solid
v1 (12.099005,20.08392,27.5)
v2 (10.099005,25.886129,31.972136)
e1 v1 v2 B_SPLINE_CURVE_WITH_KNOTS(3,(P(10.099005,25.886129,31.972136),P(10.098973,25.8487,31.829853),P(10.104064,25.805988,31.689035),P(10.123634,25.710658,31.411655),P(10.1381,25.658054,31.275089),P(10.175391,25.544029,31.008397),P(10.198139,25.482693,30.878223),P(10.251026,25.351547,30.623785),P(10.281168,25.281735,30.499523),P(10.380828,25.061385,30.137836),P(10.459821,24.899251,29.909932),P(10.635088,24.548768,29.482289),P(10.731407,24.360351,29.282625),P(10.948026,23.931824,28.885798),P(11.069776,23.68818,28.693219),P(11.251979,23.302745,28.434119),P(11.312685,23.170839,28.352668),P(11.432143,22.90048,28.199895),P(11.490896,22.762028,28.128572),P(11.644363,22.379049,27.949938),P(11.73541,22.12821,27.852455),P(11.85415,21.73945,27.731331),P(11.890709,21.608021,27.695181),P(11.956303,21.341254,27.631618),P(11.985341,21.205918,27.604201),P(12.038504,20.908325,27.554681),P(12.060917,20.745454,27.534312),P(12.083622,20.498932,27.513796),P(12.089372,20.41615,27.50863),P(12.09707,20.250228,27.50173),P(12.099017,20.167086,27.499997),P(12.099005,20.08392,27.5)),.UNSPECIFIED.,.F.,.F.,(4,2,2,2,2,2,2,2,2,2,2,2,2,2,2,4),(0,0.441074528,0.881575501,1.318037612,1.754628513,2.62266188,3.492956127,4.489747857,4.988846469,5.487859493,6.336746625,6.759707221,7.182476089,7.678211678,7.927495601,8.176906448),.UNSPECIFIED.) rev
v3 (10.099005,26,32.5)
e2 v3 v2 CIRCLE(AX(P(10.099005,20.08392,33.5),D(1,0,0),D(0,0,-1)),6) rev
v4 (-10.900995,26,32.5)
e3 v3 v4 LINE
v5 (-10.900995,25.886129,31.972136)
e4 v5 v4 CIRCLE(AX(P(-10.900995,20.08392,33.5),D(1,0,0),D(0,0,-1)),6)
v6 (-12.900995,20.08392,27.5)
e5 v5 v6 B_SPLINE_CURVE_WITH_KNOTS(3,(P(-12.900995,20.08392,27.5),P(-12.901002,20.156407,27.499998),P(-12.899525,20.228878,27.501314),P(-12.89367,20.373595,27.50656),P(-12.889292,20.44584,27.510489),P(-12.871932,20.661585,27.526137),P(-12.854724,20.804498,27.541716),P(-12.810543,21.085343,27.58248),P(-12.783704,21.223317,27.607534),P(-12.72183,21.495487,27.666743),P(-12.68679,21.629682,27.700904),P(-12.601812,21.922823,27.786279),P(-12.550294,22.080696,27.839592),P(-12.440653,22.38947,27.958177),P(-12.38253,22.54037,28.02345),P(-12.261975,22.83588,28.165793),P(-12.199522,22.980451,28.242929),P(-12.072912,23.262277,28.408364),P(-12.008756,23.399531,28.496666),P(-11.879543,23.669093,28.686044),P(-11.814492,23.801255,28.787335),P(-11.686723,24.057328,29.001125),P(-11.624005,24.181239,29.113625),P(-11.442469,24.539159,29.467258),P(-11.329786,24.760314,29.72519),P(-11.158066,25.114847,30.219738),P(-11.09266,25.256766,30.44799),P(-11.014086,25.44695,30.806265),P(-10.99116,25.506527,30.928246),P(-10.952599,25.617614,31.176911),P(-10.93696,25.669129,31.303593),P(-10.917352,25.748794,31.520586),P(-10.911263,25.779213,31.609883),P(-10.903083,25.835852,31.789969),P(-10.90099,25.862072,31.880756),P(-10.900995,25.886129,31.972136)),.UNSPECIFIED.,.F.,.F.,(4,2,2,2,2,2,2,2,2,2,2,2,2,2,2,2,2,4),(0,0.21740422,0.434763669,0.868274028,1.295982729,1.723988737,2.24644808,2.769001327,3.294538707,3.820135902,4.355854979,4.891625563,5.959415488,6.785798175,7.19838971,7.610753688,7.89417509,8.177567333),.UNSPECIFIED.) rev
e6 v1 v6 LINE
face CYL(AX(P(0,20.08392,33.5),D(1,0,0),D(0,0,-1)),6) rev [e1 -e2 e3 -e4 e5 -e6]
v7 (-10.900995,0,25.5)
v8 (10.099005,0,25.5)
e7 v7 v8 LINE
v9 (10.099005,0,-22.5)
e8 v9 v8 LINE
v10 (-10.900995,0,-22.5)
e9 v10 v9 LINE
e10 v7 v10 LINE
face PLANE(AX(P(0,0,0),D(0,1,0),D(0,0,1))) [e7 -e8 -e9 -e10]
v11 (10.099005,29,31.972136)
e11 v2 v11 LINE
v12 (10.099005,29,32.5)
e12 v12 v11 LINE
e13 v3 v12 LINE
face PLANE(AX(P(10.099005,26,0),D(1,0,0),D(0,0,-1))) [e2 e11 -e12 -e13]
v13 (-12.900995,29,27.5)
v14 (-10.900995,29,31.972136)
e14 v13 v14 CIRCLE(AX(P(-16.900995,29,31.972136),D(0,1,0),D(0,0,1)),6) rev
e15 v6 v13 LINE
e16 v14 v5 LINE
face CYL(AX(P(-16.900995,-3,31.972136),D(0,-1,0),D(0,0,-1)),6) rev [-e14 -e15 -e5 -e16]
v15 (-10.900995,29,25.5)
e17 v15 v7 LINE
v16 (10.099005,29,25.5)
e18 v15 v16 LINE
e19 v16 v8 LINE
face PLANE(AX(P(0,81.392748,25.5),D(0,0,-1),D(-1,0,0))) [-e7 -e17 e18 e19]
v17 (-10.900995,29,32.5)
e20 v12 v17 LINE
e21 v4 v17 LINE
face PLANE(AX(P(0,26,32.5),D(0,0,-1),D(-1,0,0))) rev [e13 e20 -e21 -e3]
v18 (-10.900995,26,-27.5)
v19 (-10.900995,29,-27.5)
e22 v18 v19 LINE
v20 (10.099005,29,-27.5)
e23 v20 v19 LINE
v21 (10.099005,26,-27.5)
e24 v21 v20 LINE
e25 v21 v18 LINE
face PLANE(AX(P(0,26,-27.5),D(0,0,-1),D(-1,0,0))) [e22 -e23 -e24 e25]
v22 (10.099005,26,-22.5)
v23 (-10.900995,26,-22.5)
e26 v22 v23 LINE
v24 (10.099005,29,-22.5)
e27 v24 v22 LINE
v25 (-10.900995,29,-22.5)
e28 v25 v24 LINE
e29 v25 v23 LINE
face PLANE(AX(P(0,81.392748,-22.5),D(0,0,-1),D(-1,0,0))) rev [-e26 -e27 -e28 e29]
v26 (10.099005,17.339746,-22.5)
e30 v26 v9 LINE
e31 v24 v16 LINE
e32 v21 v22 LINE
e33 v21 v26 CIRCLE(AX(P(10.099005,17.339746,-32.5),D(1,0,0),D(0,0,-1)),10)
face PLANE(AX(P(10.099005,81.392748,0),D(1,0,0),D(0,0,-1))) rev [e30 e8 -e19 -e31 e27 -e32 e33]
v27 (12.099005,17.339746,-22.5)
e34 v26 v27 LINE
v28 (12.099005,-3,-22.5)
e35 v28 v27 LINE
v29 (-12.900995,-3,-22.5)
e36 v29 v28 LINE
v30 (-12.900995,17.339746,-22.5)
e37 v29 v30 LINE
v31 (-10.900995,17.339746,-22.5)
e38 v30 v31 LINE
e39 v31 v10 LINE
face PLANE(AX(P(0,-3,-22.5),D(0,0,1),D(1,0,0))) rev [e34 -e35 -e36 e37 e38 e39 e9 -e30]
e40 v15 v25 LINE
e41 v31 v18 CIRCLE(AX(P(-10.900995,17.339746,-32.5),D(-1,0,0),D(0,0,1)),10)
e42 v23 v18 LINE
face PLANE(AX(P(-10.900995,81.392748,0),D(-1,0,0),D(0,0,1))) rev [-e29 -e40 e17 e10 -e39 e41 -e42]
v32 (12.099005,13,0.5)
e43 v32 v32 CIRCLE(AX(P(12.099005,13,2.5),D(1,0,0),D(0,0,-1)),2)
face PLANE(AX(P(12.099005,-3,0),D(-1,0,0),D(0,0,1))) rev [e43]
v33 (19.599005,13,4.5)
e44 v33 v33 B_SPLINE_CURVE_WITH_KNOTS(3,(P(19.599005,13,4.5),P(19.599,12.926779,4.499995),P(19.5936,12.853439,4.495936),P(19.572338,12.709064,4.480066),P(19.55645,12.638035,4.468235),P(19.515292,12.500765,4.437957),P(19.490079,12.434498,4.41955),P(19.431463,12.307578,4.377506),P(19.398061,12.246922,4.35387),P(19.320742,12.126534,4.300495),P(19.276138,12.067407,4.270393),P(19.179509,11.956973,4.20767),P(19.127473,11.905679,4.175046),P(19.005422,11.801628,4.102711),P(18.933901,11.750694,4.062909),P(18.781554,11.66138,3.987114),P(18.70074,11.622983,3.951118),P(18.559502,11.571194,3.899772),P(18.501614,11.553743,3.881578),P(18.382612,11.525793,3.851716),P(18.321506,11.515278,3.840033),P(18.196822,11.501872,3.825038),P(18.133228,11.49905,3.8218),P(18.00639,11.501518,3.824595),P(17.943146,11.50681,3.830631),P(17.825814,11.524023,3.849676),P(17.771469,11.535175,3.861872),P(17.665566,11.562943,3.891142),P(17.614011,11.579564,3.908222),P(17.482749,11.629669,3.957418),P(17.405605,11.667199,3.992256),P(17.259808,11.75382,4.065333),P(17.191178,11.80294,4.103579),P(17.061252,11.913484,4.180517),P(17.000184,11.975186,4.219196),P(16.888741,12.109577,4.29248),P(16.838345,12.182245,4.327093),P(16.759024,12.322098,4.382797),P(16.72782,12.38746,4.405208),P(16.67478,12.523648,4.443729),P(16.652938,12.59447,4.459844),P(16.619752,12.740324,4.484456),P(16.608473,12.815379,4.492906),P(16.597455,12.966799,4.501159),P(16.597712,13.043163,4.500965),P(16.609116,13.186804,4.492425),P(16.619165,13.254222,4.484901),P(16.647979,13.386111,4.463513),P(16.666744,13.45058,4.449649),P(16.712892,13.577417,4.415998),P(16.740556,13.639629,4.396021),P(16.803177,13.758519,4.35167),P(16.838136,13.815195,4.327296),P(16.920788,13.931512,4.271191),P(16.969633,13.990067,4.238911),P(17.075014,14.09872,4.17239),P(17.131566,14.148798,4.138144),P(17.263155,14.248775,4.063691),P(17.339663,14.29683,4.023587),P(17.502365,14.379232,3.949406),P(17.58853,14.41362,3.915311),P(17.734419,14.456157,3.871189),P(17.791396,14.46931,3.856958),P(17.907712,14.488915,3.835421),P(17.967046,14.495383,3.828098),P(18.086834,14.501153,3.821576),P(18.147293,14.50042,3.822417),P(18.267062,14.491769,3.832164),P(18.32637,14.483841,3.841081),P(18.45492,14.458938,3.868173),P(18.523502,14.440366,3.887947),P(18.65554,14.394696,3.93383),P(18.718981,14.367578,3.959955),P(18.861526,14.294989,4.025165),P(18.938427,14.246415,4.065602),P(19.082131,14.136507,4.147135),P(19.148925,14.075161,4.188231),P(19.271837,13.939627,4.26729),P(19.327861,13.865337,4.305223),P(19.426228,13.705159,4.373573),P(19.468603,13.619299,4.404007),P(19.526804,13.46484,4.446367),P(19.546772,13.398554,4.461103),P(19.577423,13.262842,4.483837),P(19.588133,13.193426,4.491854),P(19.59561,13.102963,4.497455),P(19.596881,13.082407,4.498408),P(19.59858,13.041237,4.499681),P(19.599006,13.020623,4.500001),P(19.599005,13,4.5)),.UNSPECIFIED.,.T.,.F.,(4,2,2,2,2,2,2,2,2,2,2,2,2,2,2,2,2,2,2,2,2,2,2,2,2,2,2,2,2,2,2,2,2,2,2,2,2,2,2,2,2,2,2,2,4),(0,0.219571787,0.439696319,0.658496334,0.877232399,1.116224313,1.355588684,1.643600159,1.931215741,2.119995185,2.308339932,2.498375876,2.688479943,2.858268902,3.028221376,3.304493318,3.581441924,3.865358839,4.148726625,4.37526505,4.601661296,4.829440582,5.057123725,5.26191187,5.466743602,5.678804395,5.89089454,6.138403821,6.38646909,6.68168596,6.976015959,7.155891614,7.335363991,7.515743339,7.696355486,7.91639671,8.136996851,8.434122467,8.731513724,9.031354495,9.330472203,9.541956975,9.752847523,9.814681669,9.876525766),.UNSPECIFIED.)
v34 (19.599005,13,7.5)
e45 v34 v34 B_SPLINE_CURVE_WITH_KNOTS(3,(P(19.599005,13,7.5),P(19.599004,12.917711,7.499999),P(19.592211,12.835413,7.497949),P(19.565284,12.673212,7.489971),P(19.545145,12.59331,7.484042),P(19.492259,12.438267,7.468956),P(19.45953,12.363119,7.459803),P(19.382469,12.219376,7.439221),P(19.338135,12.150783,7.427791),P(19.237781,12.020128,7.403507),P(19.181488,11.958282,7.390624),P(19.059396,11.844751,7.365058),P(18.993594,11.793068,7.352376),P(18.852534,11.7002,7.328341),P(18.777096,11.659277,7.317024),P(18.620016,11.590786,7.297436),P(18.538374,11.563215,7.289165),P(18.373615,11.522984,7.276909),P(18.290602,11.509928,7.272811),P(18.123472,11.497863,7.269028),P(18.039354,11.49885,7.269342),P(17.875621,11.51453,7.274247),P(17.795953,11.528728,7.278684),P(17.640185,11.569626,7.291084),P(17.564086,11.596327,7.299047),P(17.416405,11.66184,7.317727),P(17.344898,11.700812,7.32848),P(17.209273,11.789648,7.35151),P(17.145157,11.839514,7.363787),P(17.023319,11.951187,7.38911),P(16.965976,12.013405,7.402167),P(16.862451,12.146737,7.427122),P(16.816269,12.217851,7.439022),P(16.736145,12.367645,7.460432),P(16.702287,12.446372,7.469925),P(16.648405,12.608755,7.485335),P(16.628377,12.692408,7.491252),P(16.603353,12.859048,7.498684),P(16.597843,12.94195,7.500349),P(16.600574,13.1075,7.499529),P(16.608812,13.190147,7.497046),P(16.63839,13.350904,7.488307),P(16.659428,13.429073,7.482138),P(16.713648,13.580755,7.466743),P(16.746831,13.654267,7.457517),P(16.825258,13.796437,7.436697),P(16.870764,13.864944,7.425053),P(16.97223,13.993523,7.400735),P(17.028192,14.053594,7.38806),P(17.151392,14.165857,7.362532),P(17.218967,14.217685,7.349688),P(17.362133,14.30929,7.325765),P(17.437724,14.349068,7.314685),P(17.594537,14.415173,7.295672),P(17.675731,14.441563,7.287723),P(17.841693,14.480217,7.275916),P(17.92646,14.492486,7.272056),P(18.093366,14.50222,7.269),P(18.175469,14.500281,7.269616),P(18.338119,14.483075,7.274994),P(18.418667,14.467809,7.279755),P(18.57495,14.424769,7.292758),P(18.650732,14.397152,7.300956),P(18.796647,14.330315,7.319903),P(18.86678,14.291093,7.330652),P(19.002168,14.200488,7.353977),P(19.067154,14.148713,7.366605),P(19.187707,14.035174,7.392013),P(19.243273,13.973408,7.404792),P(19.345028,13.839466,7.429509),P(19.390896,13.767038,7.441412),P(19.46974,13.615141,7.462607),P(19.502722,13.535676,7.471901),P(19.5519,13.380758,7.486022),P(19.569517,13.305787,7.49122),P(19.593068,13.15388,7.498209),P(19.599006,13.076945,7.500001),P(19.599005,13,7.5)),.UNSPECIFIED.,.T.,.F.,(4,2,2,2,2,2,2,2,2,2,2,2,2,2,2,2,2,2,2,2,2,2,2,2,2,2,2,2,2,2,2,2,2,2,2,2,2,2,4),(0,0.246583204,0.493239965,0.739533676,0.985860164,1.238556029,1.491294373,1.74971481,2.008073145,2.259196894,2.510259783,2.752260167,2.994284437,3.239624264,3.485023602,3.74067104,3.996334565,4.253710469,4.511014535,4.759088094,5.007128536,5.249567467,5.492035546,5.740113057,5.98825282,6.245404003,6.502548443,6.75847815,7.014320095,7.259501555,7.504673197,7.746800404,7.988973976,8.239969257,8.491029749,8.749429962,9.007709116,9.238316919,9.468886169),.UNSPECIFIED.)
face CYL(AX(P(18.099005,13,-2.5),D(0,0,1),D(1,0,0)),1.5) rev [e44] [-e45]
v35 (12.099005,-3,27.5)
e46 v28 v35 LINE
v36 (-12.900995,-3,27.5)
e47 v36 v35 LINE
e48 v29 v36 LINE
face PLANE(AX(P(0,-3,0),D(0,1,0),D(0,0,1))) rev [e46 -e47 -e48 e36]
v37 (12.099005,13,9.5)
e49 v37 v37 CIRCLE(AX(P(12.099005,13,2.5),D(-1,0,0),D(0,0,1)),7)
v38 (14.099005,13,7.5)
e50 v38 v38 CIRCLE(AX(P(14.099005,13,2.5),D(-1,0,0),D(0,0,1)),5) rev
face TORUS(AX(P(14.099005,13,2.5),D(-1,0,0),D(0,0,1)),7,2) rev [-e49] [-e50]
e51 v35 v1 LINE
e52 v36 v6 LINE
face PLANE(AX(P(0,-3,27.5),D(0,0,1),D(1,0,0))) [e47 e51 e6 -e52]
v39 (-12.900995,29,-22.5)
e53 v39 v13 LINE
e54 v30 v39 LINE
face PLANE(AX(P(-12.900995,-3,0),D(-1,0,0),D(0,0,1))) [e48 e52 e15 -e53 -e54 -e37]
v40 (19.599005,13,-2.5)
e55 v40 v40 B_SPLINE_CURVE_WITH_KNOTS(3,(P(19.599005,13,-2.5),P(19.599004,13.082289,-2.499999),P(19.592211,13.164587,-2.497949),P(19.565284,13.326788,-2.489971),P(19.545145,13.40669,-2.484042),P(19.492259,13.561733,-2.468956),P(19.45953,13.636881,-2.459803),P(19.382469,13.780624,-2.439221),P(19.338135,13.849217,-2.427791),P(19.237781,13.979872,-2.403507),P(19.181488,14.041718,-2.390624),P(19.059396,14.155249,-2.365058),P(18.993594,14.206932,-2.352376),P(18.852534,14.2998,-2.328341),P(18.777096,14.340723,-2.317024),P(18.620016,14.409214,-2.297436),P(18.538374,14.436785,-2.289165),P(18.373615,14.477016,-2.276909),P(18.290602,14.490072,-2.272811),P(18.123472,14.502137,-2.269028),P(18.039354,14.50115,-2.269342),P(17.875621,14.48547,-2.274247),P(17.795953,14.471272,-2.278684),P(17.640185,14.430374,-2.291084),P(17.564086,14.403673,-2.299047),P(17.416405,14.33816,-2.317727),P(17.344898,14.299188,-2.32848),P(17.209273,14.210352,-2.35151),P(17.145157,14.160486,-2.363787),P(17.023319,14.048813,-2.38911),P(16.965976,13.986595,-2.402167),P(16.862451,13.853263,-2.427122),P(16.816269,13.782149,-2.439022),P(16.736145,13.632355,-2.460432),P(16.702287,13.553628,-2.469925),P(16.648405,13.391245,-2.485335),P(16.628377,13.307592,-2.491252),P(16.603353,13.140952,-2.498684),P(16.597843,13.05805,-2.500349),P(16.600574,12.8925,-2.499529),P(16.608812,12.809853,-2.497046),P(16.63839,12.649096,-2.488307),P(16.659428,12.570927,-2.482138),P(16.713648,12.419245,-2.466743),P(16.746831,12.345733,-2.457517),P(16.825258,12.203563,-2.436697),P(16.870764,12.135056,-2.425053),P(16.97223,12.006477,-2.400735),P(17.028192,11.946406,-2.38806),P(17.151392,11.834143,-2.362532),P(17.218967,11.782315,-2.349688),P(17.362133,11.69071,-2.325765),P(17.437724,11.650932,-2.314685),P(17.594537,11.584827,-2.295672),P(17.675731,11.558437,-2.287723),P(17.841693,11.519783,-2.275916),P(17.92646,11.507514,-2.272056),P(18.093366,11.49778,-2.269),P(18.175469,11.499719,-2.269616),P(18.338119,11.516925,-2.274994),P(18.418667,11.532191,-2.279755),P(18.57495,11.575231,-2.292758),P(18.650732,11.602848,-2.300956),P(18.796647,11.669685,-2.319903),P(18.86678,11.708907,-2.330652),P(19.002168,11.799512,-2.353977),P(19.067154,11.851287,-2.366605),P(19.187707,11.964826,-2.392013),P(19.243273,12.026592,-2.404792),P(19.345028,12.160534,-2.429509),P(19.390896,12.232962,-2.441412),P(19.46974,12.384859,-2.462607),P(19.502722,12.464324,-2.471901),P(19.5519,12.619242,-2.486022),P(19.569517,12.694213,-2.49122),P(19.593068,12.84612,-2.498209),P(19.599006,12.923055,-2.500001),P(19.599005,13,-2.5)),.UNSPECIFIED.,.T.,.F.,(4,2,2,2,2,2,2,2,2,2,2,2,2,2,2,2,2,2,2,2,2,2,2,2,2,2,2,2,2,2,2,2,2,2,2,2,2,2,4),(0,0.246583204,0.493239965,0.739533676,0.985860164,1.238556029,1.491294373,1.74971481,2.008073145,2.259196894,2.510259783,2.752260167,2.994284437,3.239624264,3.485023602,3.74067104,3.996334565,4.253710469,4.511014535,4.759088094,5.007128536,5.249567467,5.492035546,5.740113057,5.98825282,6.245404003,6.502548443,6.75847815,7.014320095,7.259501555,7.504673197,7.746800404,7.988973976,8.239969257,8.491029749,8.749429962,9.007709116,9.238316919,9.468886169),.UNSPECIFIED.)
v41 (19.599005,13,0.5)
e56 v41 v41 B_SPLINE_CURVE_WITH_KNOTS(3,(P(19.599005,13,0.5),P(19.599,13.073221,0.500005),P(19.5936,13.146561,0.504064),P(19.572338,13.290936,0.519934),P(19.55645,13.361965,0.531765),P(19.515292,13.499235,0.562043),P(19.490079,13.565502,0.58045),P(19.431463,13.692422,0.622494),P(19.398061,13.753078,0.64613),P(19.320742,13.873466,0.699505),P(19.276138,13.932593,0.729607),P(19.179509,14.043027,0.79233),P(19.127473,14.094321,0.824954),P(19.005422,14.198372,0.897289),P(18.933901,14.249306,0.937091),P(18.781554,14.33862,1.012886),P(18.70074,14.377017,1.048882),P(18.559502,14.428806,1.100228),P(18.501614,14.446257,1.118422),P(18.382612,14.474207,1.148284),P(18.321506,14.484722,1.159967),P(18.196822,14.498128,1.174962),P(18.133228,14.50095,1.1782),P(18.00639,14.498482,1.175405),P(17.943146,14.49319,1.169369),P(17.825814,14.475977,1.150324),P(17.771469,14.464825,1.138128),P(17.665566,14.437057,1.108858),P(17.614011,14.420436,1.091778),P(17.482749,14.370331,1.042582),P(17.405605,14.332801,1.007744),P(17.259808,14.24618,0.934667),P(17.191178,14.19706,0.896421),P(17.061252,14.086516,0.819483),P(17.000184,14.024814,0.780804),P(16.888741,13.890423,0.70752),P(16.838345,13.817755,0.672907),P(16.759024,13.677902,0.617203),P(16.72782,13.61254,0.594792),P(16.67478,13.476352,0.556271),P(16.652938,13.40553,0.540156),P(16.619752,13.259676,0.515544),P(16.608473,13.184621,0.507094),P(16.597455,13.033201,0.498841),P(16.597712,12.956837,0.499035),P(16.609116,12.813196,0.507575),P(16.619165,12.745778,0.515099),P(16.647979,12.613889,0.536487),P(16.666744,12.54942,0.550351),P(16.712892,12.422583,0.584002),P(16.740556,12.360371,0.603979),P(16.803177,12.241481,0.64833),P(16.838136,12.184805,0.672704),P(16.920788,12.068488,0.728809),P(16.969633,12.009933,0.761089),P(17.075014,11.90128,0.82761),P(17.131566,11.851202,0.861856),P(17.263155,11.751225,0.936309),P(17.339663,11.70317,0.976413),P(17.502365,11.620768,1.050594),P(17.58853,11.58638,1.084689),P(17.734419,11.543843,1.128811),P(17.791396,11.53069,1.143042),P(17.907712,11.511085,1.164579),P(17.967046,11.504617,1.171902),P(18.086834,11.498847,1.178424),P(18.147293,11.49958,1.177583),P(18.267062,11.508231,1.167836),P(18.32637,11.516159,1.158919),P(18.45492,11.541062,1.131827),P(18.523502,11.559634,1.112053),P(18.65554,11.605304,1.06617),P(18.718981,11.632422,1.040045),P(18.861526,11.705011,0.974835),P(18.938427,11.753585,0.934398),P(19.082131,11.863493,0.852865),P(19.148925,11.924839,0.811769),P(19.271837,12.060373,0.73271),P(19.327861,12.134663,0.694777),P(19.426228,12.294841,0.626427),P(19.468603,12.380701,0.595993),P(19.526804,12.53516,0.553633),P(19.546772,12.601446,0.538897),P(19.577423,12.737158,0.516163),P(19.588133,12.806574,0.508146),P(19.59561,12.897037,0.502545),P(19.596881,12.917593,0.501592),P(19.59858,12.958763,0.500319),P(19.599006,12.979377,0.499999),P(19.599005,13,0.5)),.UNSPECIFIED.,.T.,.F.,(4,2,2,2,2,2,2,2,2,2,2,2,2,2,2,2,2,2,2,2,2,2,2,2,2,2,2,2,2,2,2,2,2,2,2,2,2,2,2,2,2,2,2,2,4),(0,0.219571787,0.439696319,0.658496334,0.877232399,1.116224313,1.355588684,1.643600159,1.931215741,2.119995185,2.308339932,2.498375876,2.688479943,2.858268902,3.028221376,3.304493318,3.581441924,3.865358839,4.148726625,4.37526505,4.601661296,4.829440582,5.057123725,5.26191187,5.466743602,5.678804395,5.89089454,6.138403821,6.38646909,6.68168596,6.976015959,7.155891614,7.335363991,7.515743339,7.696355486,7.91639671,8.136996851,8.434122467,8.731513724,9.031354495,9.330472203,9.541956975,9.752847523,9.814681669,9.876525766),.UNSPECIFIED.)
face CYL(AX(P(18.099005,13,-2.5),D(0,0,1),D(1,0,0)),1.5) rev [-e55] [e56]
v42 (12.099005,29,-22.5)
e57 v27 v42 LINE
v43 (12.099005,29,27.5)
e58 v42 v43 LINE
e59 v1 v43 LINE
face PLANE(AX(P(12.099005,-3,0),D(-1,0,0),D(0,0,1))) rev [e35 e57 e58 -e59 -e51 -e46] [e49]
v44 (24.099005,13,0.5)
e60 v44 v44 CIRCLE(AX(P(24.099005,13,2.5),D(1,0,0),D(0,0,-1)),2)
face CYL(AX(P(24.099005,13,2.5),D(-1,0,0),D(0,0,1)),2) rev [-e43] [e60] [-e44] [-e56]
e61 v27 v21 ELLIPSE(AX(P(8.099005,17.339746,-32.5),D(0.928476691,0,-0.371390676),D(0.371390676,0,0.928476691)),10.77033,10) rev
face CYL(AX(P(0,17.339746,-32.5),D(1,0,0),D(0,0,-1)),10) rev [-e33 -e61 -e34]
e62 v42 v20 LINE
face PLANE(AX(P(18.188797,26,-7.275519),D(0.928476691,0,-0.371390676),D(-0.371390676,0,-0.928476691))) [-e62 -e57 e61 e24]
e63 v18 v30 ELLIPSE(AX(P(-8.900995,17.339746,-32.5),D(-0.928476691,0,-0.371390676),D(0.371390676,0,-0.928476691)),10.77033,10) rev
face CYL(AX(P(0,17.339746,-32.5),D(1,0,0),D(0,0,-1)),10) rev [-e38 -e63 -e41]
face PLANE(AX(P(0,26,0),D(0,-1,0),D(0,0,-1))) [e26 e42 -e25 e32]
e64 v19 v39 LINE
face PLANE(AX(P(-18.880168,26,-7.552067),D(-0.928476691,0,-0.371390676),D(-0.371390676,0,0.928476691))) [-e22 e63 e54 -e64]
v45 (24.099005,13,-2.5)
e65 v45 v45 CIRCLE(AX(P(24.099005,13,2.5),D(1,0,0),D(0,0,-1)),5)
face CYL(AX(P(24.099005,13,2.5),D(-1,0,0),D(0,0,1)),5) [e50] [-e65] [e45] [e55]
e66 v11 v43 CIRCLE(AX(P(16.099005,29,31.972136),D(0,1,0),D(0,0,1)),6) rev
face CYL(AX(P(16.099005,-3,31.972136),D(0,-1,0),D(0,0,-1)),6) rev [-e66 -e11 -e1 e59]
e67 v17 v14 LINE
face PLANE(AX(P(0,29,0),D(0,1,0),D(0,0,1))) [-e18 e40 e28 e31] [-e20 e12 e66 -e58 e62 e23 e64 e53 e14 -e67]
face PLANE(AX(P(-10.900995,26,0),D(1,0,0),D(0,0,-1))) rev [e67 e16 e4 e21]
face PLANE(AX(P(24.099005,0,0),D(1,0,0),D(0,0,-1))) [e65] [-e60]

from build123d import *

# Parameters (mm, degrees)
BOSS_EXTRUDE1_DEPTH      = 29
BOSS_EXTRUDE1_DEPTH_BACK = 3
SKETCH1_W                = 25
SKETCH1_H                = 50
BOSS_EXTRUDE2_DEPTH      = 3
BOSS_EXTRUDE3_START      = 29
SKETCH1_4_W              = 21
SKETCH1_4_H              = 5
BOSS_EXTRUDE3_DEPTH      = 3
CUT_EXTRUDE1_DEPTH       = 29
FILLET1_START            = -12.900995056
FILLET1_DEPTH            = 2
FILLET1_START_2          = 10.099004944
FILLET1_2_DEPTH          = 2
FILLET1_START_3          = 16
FILLET1_3_DEPTH          = 10
FILLET2_R                = 6
SKETCH2_R                = 5
SKETCH2_R_2              = 2
BOSS_EXTRUDE4_DEPTH      = 12
CUT_EXTRUDE3_DEPTH       = 30
FILLET5_R                = 2


with BuildPart() as part:
    # Sketch1 → Boss-Extrude1 (new, two sides: drawn at the far end of the back side and taken through both)
    with BuildSketch(Plane(origin=(0, 0, 0), x_dir=(1, 0, 0), z_dir=(0, 1, 0)).offset(-BOSS_EXTRUDE1_DEPTH_BACK)):
        with Locations((-0.400995056, -2.5)):
            Rectangle(SKETCH1_W, SKETCH1_H)
    extrude(amount=BOSS_EXTRUDE1_DEPTH + BOSS_EXTRUDE1_DEPTH_BACK)

    # Sketch1<3> → Boss-Extrude2 (add)
    with BuildSketch(Plane(origin=(0, 0, 0), x_dir=(1, 0, 0), z_dir=(0, 1, 0))):
        Polygon((-10.900995056, 22.5), (-10.900995056, 20.5), (-10.900995056, -25.5), (10.099004944, -25.5), (10.099004944, 20.5), (10.099004944, 22.5), align=None)
    extrude(amount=-BOSS_EXTRUDE2_DEPTH)

    # Sketch1<4> → Boss-Extrude3 (add)
    with BuildSketch(Plane(origin=(0, 0, 0), x_dir=(1, 0, 0), z_dir=(0, 1, 0)).offset(BOSS_EXTRUDE3_START)):
        Polygon((-12.900995056, 22.5), (12.099004944, 22.5), (10.099004944, 27.5), (-10.900995056, 27.5), align=None)
        with Locations((-0.400995056, -30)):
            Rectangle(SKETCH1_4_W, SKETCH1_4_H)
    extrude(amount=-BOSS_EXTRUDE3_DEPTH)

    # Sketch1<5> → Cut-Extrude1 (cut)
    with BuildSketch(Plane(origin=(0, 0, 0), x_dir=(1, 0, 0), z_dir=(0, 1, 0))):
        Polygon((-10.900995056, 22.5), (10.099004944, 22.5), (10.099004944, 20.5), (10.099004944, -25.5), (-10.900995056, -25.5), (-10.900995056, 20.5), align=None)
    extrude(amount=CUT_EXTRUDE1_DEPTH, mode=Mode.SUBTRACT)

    # Fillet1: read off the stored shape, not the designer's step
    # Fillet1 outline → Fillet1 (add)
    with BuildSketch(Plane.YZ.offset(FILLET1_START)):
        with BuildLine():
            ThreePointArc((17.339745962, -22.5), (22.339745962, -23.839745962), (26, -27.5))
            Line((26, -27.5), (26, -22.5))
            Line((26, -22.5), (17.339745962, -22.5))
        make_face()
    extrude(amount=FILLET1_DEPTH)

    # Fillet1 2 outline → Fillet1 2 (add)
    with BuildSketch(Plane.YZ.offset(FILLET1_START_2)):
        with BuildLine():
            ThreePointArc((17.339745962, -22.5), (22.339745962, -23.839745962), (26, -27.5))
            Line((26, -27.5), (26, -22.5))
            Line((26, -22.5), (17.339745962, -22.5))
        make_face()
    extrude(amount=FILLET1_2_DEPTH)

    # Fillet1 3 outline → Fillet1 3 (cut)
    with BuildSketch(Plane(origin=(0, 0, 0), x_dir=(1, 0, 0), z_dir=(0, 1, 0)).offset(FILLET1_START_3)):
        Polygon((-13.500995056, 21), (-10.300995056, 29), (-14, 29), (-14, 21), align=None)
        Polygon((14, 29), (9.499004944, 29), (12.699004944, 21), (14, 21), align=None)
    extrude(amount=FILLET1_3_DEPTH, mode=Mode.SUBTRACT)

    # Fillet2
    # the kernel refuses this fillet: 6 mm, written as the material it adds along each edge
    with BuildSketch(Plane(origin=(10.099004944, 26, 27.5), x_dir=(0, 0, 1), z_dir=(-1, 0, 0))) as fillet2_piece_1:
        with BuildLine():
            CenterArc((6, -5.916079783), FILLET2_R, 99.594068227, 80.405931773)
            Line((0, -5.916079783), (0, 0))
            Line((0, 0), (5, 0))
        make_face()
    extrude(amount=21)
    with BuildSketch(Plane(origin=(10.099004944, 29, 27.5), x_dir=(0, 0, 1), z_dir=(0, -1, 0))) as fillet2_piece_2:
        with BuildLine():
            CenterArc((4.472135955, -6), FILLET2_R, 90, 48.189685104)
            Line((0, -2), (0, 0))
            Line((0, 0), (4.472135955, 0))
        make_face()
    extrude(amount=3)
    with BuildSketch(Plane(origin=(-10.900995056, 29, 27.5), x_dir=(0, 0, 1), z_dir=(0, -1, 0))) as fillet2_piece_3:
        with BuildLine():
            CenterArc((4.472135955, 6), FILLET2_R, 221.810314896, 48.189685104)
            Line((0, 2), (0, 0))
            Line((0, 0), (4.472135955, 0))
        make_face()
    extrude(amount=3)
    with BuildSketch(Plane(origin=(24.889204401, 26, 27.5), x_dir=(0, 0, 1), z_dir=(-1, 0, 0))) as fillet2_piece_4a_section:
        with BuildLine():
            CenterArc((6, -5.916079783), FILLET2_R, 99.594068227, 80.405931773)
            Line((0, -5.916079783), (0, 0))
            Line((0, 0), (5, 0))
        make_face()
    fillet2_piece_4a = extrude(amount=35.790199458, mode=Mode.PRIVATE)
    fillet2_piece_4a = split(fillet2_piece_4a, bisect_by=Plane(origin=(12.099004944, 26, 27.5), z_dir=(-1, 0, 0)), keep=Keep.TOP, mode=Mode.PRIVATE)
    fillet2_piece_4a = split(fillet2_piece_4a, bisect_by=Plane(origin=(10.099004944, 26, 27.5), z_dir=(1, 0, 0)), keep=Keep.TOP, mode=Mode.PRIVATE)
    with BuildSketch(Plane(origin=(10.099004944, 29, 27.5), x_dir=(0, 0, 1), z_dir=(0, -1, 0))) as fillet2_piece_4b_section:
        with BuildLine():
            CenterArc((4.472135955, -6), FILLET2_R, 90, 48.189685104)
            Line((0, -2), (0, 0))
            Line((0, 0), (4.472135955, 0))
        make_face()
    fillet2_piece_4b = extrude(amount=14.180339887, mode=Mode.PRIVATE)
    fillet2_piece_4b = split(fillet2_piece_4b, bisect_by=Plane(origin=(10.099004944, 26, 27.5), z_dir=(0, -1, 0)), keep=Keep.TOP, mode=Mode.PRIVATE)
    fillet2_piece_4 = fillet2_piece_4a & fillet2_piece_4b
    add(fillet2_piece_4)
    with BuildSketch(Plane(origin=(-10.900995056, 29, 27.5), x_dir=(0, 0, 1), z_dir=(0, -1, 0))) as fillet2_piece_5a_section:
        with BuildLine():
            CenterArc((4.472135955, 6), FILLET2_R, 221.810314896, 48.189685104)
            Line((0, 2), (0, 0))
            Line((0, 0), (4.472135955, 0))
        make_face()
    fillet2_piece_5a = extrude(amount=14.180339887, mode=Mode.PRIVATE)
    fillet2_piece_5a = split(fillet2_piece_5a, bisect_by=Plane(origin=(-10.900995056, 26, 27.5), z_dir=(0, -1, 0)), keep=Keep.TOP, mode=Mode.PRIVATE)
    with BuildSketch(Plane(origin=(10.099004944, 26, 27.5), x_dir=(0, 0, 1), z_dir=(-1, 0, 0))) as fillet2_piece_5b_section:
        with BuildLine():
            CenterArc((6, -5.916079783), FILLET2_R, 99.594068227, 80.405931773)
            Line((0, -5.916079783), (0, 0))
            Line((0, 0), (5, 0))
        make_face()
    fillet2_piece_5b = extrude(amount=35.790199458, mode=Mode.PRIVATE)
    fillet2_piece_5b = split(fillet2_piece_5b, bisect_by=Plane(origin=(-12.900995056, 26, 27.5), z_dir=(1, 0, 0)), keep=Keep.TOP, mode=Mode.PRIVATE)
    fillet2_piece_5b = split(fillet2_piece_5b, bisect_by=Plane(origin=(-10.900995056, 26, 27.5), z_dir=(-1, 0, 0)), keep=Keep.TOP, mode=Mode.PRIVATE)
    fillet2_piece_5 = fillet2_piece_5a & fillet2_piece_5b
    add(fillet2_piece_5)

    # Sketch2 → Boss-Extrude4 (add)
    with BuildSketch(Plane(origin=(12.099004944, 0, 0), x_dir=(0, 0, -1), z_dir=(1, 0, 0))):
        with Locations(Location((-2.5, 13, 0), (0, 0, 180))):
            Circle(SKETCH2_R)
        with Locations((-2.5, 13)):
            Circle(SKETCH2_R_2, mode=Mode.SUBTRACT)
    extrude(amount=BOSS_EXTRUDE4_DEPTH)

    # Sketch3 → Cut-Extrude3 (cut)
    with BuildSketch(Plane.XY.offset(27.5)):
        with BuildLine():
            ThreePointArc((19.599004944, 13), (19.159665115, 14.060660172), (18.099004944, 14.5))
            Line((18.099004944, 14.5), (18.099004944, 11.5))
            ThreePointArc((18.099004944, 11.5), (19.159665115, 11.939339828), (19.599004944, 13))
        make_face()
        with BuildLine():
            Line((18.099004944, 11.5), (18.099004944, 14.5))
            ThreePointArc((18.099004944, 14.5), (16.599004944, 13), (18.099004944, 11.5))
        make_face()
    extrude(amount=-CUT_EXTRUDE3_DEPTH, mode=Mode.SUBTRACT)

    # Fillet5
    fillet5_edges = [part.edges().sort_by_distance(p)[0] for p in [
        (12.099004944, 13, -2.5),
    ]]
    fillet(fillet5_edges, radius=FILLET5_R)


solid = part.part
